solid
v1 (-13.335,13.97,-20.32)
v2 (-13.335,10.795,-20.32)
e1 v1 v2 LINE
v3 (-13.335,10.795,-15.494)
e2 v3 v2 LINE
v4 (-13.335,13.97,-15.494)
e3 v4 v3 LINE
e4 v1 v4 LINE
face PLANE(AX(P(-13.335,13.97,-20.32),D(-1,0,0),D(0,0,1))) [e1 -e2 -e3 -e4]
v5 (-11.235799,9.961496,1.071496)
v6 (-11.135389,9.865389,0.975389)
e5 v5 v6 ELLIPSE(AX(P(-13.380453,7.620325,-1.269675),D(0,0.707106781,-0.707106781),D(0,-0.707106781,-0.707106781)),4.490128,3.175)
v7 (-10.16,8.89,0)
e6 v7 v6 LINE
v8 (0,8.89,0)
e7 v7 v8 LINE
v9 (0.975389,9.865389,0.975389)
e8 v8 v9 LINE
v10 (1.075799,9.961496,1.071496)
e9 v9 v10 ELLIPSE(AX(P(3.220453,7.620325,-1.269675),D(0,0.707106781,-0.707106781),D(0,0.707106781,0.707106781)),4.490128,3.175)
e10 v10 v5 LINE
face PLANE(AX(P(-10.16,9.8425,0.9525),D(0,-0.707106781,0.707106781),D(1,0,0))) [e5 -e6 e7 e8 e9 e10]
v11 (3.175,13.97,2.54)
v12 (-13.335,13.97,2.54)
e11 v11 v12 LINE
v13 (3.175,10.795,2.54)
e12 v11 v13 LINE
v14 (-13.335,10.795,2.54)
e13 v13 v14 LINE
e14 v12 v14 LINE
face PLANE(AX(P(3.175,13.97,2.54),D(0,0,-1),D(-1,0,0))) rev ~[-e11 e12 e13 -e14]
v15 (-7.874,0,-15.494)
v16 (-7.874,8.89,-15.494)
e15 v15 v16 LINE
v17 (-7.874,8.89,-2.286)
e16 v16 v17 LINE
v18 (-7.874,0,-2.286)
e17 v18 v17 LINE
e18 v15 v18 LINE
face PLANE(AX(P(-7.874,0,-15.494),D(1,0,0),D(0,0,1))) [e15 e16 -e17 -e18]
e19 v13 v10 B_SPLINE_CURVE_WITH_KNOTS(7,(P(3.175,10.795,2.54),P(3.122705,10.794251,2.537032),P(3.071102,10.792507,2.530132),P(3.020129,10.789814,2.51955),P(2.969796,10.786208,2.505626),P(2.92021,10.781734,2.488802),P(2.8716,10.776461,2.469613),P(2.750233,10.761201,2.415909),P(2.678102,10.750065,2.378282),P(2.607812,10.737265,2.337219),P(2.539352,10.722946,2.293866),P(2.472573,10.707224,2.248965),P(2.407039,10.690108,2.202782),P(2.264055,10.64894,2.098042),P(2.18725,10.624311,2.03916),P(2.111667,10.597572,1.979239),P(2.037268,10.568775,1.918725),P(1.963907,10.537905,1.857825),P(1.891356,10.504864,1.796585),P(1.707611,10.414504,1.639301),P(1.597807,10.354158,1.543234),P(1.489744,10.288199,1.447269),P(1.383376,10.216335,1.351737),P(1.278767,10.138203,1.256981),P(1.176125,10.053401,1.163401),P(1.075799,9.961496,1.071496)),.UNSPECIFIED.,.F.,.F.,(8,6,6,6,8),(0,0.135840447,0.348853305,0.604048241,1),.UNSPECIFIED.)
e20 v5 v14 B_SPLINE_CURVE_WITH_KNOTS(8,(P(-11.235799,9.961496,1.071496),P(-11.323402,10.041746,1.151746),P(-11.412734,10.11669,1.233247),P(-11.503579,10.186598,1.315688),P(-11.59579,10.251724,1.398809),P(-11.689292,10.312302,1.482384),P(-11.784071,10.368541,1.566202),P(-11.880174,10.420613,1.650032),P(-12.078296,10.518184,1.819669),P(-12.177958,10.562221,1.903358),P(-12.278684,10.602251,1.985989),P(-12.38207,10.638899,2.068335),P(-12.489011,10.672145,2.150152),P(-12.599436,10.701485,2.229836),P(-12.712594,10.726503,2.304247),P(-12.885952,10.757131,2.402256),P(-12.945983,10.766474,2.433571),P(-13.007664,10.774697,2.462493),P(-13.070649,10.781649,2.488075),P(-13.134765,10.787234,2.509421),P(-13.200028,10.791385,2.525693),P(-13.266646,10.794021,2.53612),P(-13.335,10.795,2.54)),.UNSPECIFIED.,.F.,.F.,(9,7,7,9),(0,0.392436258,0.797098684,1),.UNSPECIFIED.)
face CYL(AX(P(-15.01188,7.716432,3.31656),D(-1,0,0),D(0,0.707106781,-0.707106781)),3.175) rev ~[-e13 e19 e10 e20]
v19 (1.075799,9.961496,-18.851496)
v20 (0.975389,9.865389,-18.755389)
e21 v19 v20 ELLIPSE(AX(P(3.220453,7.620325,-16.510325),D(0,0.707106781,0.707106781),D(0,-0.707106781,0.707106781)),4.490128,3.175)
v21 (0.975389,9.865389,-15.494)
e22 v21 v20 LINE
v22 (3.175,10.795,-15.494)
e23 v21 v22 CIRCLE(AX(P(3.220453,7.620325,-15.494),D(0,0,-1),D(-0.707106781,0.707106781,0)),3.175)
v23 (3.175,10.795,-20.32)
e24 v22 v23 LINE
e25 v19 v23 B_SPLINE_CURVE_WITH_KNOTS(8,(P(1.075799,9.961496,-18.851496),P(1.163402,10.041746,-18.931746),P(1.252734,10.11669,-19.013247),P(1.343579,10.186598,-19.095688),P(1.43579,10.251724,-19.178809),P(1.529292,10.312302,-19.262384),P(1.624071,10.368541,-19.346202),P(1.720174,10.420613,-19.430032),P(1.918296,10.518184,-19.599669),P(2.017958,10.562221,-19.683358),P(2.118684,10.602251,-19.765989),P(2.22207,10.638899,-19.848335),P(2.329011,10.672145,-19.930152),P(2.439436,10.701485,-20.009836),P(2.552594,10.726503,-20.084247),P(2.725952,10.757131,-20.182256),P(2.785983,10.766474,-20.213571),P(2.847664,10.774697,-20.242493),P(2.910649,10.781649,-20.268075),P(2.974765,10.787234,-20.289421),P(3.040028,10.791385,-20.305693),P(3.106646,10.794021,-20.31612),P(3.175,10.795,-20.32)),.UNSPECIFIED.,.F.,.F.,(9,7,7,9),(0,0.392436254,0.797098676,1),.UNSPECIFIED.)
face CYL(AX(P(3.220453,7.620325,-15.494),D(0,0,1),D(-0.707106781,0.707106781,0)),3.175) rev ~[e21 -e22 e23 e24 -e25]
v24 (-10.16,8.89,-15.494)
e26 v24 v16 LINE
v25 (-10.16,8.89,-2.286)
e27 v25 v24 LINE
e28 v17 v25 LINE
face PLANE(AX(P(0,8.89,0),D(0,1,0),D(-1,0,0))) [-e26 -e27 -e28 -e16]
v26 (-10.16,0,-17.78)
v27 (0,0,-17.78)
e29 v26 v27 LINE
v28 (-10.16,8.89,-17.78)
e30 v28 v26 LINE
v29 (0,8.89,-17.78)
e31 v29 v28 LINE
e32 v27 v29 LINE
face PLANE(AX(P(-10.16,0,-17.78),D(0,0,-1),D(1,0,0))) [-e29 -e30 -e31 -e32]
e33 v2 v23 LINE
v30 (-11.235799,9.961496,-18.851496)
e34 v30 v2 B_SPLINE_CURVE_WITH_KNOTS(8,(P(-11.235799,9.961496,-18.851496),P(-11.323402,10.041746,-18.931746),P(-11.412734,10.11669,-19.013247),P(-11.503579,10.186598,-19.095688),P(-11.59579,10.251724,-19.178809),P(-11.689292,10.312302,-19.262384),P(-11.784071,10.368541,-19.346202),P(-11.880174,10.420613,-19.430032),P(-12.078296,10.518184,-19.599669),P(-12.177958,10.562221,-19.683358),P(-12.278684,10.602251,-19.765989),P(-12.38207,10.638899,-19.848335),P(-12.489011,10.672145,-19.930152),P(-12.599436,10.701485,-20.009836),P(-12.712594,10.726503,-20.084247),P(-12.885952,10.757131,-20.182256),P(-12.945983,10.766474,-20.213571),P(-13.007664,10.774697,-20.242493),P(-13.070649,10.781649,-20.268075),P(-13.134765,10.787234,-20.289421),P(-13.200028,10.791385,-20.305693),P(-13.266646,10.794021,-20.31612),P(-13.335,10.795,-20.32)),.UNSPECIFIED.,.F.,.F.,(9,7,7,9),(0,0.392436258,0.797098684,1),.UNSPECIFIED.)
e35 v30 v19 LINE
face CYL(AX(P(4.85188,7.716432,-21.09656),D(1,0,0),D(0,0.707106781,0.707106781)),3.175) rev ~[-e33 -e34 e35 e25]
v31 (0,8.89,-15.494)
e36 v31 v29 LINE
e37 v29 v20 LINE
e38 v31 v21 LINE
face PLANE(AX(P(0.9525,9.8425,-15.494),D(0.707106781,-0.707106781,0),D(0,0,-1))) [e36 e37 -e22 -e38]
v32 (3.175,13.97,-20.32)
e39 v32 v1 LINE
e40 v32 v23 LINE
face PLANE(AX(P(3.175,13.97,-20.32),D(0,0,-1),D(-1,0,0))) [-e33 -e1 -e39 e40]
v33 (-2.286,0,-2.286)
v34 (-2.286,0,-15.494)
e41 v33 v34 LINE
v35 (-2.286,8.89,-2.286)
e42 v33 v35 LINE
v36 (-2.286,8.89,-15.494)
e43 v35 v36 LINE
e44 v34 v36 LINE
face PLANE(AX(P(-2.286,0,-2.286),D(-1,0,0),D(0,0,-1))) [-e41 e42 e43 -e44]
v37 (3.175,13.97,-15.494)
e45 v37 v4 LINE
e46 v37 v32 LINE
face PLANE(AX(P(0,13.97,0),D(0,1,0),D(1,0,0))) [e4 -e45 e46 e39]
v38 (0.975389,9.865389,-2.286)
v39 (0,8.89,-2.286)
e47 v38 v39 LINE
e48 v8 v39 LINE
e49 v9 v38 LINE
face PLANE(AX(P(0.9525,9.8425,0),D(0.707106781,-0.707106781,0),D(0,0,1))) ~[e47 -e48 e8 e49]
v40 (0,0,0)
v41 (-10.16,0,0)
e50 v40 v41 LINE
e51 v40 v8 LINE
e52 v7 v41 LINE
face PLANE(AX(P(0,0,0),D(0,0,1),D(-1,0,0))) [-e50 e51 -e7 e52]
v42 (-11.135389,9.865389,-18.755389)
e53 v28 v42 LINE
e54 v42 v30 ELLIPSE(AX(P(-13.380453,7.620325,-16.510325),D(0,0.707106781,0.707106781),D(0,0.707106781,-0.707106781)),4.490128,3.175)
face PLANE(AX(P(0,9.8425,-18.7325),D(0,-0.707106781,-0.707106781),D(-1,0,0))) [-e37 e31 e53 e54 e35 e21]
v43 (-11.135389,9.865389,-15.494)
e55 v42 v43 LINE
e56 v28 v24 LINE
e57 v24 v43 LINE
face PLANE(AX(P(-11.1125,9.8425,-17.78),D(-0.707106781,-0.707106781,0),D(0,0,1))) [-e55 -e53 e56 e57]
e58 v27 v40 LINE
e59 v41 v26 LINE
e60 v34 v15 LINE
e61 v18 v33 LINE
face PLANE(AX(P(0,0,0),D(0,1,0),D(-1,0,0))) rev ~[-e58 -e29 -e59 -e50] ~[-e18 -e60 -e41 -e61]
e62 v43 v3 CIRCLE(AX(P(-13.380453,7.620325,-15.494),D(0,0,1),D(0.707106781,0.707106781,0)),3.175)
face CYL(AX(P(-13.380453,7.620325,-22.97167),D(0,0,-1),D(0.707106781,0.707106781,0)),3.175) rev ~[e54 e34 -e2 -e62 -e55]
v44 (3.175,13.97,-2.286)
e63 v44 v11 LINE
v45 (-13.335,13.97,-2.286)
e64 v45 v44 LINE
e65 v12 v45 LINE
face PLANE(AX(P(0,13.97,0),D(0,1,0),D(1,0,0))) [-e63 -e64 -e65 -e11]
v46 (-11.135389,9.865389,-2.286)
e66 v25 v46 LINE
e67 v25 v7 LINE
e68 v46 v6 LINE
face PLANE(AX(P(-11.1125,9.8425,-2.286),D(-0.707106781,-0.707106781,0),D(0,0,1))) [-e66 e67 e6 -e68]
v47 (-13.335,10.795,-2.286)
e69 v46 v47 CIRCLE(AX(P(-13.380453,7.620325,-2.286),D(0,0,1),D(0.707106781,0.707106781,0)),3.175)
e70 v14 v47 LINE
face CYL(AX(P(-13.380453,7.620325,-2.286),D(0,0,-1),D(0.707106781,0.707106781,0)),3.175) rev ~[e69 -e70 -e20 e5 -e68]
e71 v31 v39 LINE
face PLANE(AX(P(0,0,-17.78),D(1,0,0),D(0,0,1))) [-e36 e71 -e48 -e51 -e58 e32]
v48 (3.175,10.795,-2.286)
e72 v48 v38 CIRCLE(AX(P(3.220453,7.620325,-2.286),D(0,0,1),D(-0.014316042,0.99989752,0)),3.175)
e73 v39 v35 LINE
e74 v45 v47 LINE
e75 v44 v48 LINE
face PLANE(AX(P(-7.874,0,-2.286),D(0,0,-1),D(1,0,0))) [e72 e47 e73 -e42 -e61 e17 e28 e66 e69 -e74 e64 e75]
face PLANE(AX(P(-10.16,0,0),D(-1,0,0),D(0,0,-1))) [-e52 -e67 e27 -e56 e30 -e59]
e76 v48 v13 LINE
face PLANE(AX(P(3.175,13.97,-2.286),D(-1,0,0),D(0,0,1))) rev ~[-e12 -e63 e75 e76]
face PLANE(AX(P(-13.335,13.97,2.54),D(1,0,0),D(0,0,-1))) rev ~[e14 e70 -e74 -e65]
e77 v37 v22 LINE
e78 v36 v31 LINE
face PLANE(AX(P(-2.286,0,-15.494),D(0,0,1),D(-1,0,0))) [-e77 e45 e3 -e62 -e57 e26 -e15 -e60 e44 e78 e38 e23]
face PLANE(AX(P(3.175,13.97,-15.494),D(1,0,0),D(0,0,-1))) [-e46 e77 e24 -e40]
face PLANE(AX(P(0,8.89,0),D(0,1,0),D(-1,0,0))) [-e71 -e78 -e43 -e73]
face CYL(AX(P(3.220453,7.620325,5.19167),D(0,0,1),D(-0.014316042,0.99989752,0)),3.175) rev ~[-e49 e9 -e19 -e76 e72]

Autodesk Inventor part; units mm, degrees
ref_plane "YZ Plane" through (0, 0, 0) normal (1, 0, 0) x (0, 1, 0)
ref_plane "XZ Plane" through (0, 0, 0) normal (0, 1, 0) x (-1, 0, 0)
ref_plane "XY Plane" through (0, 0, 0) normal (0, 0, 1) x (1, 0, 0)
sketch "Sketch1" plane through (0, 0, 0) normal (0, 1, 0) x (-1, 0, 0)
  line L0 (0, 0) -> (10.16, 0)
  line L1 (10.16, 0) -> (10.16, -17.78)
  line L2 (10.16, -17.78) -> (0, -17.78)
  line L3 (0, -17.78) -> (0, 0)
  line L4 (7.874, -15.494) -> (7.874, -2.286)
  line L5 (7.874, -2.286) -> (2.286, -2.286)
  line L6 (2.286, -2.286) -> (2.286, -15.494)
  line L7 (2.286, -15.494) -> (7.874, -15.494)
  dimension "d0" = 17.78
  dimension "d1" = 10.16
  dimension "d2" = 2.286
extrude "Extrusion1" add sketch "Sketch1" along normal blind 8.89
sketch "Sketch2" plane through (0, 8.89, 0) normal (0, 1, 0) x (1, 0, 0)
  line L0 (-10.16, 0) -> (0, 0) projected
  line L1 (-2.286, 2.286) -> (-7.874, 2.286) projected
  line L2 (-7.874, 15.494) -> (-2.286, 15.494) projected
  line L3 (0, 17.78) -> (-10.16, 17.78) projected
  line L4 (-10.16, 0) -> (0, 0)
  line L5 (0, 0) -> (0, 2.286)
  line L6 (0, 2.286) -> (-10.16, 2.286)
  line L7 (-10.16, 2.286) -> (-10.16, 0)
  line L8 (-10.16, 0) -> (-10.16, 17.78) projected
  line L9 (0, 17.78) -> (-10.16, 17.78)
  line L10 (-10.16, 17.78) -> (-10.16, 15.494)
  line L11 (-10.16, 15.494) -> (0, 15.494)
  line L12 (0, 15.494) -> (0, 17.78)
extrude "Extrusion2" add sketch "Sketch2" along normal blind 5.08
sketch "Sketch3" plane through (0, 13.97, 0) normal (0, 1, 0) x (1, 0, 0)
  line L0 (-10.16, 0) -> (0, 0) projected
  line L1 (0, 17.78) -> (-10.16, 17.78) projected
  line L2 (-10.16, 15.494) -> (0, 15.494) projected
  line L3 (0, 15.494) -> (0, 17.78) projected
  line L4 (0, 17.78) -> (-10.16, 17.78) projected
  line L5 (-10.16, 17.78) -> (-10.16, 15.494) projected
  line L6 (-10.16, 0) -> (0, 0) projected
  line L7 (0, 0) -> (0, 2.286) projected
  line L8 (0, 2.286) -> (-10.16, 2.286) projected
  line L9 (-10.16, 2.286) -> (-10.16, 0) projected
  line L10 (-13.335, 2.286) -> (3.175, 2.286)
  line L11 (3.175, 2.286) -> (3.175, -2.54)
  line L12 (3.175, -2.54) -> (-13.335, -2.54)
  line L13 (-13.335, -2.54) -> (-13.335, 2.286)
  line L14 (-13.335, 15.494) -> (3.175, 15.494)
  line L15 (3.175, 15.494) -> (3.175, 20.32)
  line L16 (3.175, 20.32) -> (-13.335, 20.32)
  line L17 (-13.335, 20.32) -> (-13.335, 15.494)
  dimension "d7" = 3.175
  dimension "d8" = 3.175
  dimension "d9" = 2.54
  dimension "d10" = 2.54
extrude "Extrusion3" add sketch "Sketch3" against normal blind 3.175 contours L0 L7 L10 L11 L12 L13 L9 | L1 L5 L14 L17 L16 L15 L3
chamfer "Chamfer1" distance 1.905 angle 45 6 edges at (-5.08, 10.795, 0) (0, 10.795, -1.143) (-10.16, 10.795, -1.143) (0, 10.795, -16.637) (-5.08, 10.795, -17.78) (-10.16, 10.795, -16.637)
fillet "Fillet1" radius 3.175 6 edges at (1.905, 10.795, -17.5895) (-5.08, 10.795, -19.685) (-12.065, 10.795, -17.5895) (-12.065, 10.795, -0.1905) (-5.08, 10.795, 1.905) (1.905, 10.795, -0.1905)
properties part number "ForeConnectorHolder" material "ABS Plastic"
